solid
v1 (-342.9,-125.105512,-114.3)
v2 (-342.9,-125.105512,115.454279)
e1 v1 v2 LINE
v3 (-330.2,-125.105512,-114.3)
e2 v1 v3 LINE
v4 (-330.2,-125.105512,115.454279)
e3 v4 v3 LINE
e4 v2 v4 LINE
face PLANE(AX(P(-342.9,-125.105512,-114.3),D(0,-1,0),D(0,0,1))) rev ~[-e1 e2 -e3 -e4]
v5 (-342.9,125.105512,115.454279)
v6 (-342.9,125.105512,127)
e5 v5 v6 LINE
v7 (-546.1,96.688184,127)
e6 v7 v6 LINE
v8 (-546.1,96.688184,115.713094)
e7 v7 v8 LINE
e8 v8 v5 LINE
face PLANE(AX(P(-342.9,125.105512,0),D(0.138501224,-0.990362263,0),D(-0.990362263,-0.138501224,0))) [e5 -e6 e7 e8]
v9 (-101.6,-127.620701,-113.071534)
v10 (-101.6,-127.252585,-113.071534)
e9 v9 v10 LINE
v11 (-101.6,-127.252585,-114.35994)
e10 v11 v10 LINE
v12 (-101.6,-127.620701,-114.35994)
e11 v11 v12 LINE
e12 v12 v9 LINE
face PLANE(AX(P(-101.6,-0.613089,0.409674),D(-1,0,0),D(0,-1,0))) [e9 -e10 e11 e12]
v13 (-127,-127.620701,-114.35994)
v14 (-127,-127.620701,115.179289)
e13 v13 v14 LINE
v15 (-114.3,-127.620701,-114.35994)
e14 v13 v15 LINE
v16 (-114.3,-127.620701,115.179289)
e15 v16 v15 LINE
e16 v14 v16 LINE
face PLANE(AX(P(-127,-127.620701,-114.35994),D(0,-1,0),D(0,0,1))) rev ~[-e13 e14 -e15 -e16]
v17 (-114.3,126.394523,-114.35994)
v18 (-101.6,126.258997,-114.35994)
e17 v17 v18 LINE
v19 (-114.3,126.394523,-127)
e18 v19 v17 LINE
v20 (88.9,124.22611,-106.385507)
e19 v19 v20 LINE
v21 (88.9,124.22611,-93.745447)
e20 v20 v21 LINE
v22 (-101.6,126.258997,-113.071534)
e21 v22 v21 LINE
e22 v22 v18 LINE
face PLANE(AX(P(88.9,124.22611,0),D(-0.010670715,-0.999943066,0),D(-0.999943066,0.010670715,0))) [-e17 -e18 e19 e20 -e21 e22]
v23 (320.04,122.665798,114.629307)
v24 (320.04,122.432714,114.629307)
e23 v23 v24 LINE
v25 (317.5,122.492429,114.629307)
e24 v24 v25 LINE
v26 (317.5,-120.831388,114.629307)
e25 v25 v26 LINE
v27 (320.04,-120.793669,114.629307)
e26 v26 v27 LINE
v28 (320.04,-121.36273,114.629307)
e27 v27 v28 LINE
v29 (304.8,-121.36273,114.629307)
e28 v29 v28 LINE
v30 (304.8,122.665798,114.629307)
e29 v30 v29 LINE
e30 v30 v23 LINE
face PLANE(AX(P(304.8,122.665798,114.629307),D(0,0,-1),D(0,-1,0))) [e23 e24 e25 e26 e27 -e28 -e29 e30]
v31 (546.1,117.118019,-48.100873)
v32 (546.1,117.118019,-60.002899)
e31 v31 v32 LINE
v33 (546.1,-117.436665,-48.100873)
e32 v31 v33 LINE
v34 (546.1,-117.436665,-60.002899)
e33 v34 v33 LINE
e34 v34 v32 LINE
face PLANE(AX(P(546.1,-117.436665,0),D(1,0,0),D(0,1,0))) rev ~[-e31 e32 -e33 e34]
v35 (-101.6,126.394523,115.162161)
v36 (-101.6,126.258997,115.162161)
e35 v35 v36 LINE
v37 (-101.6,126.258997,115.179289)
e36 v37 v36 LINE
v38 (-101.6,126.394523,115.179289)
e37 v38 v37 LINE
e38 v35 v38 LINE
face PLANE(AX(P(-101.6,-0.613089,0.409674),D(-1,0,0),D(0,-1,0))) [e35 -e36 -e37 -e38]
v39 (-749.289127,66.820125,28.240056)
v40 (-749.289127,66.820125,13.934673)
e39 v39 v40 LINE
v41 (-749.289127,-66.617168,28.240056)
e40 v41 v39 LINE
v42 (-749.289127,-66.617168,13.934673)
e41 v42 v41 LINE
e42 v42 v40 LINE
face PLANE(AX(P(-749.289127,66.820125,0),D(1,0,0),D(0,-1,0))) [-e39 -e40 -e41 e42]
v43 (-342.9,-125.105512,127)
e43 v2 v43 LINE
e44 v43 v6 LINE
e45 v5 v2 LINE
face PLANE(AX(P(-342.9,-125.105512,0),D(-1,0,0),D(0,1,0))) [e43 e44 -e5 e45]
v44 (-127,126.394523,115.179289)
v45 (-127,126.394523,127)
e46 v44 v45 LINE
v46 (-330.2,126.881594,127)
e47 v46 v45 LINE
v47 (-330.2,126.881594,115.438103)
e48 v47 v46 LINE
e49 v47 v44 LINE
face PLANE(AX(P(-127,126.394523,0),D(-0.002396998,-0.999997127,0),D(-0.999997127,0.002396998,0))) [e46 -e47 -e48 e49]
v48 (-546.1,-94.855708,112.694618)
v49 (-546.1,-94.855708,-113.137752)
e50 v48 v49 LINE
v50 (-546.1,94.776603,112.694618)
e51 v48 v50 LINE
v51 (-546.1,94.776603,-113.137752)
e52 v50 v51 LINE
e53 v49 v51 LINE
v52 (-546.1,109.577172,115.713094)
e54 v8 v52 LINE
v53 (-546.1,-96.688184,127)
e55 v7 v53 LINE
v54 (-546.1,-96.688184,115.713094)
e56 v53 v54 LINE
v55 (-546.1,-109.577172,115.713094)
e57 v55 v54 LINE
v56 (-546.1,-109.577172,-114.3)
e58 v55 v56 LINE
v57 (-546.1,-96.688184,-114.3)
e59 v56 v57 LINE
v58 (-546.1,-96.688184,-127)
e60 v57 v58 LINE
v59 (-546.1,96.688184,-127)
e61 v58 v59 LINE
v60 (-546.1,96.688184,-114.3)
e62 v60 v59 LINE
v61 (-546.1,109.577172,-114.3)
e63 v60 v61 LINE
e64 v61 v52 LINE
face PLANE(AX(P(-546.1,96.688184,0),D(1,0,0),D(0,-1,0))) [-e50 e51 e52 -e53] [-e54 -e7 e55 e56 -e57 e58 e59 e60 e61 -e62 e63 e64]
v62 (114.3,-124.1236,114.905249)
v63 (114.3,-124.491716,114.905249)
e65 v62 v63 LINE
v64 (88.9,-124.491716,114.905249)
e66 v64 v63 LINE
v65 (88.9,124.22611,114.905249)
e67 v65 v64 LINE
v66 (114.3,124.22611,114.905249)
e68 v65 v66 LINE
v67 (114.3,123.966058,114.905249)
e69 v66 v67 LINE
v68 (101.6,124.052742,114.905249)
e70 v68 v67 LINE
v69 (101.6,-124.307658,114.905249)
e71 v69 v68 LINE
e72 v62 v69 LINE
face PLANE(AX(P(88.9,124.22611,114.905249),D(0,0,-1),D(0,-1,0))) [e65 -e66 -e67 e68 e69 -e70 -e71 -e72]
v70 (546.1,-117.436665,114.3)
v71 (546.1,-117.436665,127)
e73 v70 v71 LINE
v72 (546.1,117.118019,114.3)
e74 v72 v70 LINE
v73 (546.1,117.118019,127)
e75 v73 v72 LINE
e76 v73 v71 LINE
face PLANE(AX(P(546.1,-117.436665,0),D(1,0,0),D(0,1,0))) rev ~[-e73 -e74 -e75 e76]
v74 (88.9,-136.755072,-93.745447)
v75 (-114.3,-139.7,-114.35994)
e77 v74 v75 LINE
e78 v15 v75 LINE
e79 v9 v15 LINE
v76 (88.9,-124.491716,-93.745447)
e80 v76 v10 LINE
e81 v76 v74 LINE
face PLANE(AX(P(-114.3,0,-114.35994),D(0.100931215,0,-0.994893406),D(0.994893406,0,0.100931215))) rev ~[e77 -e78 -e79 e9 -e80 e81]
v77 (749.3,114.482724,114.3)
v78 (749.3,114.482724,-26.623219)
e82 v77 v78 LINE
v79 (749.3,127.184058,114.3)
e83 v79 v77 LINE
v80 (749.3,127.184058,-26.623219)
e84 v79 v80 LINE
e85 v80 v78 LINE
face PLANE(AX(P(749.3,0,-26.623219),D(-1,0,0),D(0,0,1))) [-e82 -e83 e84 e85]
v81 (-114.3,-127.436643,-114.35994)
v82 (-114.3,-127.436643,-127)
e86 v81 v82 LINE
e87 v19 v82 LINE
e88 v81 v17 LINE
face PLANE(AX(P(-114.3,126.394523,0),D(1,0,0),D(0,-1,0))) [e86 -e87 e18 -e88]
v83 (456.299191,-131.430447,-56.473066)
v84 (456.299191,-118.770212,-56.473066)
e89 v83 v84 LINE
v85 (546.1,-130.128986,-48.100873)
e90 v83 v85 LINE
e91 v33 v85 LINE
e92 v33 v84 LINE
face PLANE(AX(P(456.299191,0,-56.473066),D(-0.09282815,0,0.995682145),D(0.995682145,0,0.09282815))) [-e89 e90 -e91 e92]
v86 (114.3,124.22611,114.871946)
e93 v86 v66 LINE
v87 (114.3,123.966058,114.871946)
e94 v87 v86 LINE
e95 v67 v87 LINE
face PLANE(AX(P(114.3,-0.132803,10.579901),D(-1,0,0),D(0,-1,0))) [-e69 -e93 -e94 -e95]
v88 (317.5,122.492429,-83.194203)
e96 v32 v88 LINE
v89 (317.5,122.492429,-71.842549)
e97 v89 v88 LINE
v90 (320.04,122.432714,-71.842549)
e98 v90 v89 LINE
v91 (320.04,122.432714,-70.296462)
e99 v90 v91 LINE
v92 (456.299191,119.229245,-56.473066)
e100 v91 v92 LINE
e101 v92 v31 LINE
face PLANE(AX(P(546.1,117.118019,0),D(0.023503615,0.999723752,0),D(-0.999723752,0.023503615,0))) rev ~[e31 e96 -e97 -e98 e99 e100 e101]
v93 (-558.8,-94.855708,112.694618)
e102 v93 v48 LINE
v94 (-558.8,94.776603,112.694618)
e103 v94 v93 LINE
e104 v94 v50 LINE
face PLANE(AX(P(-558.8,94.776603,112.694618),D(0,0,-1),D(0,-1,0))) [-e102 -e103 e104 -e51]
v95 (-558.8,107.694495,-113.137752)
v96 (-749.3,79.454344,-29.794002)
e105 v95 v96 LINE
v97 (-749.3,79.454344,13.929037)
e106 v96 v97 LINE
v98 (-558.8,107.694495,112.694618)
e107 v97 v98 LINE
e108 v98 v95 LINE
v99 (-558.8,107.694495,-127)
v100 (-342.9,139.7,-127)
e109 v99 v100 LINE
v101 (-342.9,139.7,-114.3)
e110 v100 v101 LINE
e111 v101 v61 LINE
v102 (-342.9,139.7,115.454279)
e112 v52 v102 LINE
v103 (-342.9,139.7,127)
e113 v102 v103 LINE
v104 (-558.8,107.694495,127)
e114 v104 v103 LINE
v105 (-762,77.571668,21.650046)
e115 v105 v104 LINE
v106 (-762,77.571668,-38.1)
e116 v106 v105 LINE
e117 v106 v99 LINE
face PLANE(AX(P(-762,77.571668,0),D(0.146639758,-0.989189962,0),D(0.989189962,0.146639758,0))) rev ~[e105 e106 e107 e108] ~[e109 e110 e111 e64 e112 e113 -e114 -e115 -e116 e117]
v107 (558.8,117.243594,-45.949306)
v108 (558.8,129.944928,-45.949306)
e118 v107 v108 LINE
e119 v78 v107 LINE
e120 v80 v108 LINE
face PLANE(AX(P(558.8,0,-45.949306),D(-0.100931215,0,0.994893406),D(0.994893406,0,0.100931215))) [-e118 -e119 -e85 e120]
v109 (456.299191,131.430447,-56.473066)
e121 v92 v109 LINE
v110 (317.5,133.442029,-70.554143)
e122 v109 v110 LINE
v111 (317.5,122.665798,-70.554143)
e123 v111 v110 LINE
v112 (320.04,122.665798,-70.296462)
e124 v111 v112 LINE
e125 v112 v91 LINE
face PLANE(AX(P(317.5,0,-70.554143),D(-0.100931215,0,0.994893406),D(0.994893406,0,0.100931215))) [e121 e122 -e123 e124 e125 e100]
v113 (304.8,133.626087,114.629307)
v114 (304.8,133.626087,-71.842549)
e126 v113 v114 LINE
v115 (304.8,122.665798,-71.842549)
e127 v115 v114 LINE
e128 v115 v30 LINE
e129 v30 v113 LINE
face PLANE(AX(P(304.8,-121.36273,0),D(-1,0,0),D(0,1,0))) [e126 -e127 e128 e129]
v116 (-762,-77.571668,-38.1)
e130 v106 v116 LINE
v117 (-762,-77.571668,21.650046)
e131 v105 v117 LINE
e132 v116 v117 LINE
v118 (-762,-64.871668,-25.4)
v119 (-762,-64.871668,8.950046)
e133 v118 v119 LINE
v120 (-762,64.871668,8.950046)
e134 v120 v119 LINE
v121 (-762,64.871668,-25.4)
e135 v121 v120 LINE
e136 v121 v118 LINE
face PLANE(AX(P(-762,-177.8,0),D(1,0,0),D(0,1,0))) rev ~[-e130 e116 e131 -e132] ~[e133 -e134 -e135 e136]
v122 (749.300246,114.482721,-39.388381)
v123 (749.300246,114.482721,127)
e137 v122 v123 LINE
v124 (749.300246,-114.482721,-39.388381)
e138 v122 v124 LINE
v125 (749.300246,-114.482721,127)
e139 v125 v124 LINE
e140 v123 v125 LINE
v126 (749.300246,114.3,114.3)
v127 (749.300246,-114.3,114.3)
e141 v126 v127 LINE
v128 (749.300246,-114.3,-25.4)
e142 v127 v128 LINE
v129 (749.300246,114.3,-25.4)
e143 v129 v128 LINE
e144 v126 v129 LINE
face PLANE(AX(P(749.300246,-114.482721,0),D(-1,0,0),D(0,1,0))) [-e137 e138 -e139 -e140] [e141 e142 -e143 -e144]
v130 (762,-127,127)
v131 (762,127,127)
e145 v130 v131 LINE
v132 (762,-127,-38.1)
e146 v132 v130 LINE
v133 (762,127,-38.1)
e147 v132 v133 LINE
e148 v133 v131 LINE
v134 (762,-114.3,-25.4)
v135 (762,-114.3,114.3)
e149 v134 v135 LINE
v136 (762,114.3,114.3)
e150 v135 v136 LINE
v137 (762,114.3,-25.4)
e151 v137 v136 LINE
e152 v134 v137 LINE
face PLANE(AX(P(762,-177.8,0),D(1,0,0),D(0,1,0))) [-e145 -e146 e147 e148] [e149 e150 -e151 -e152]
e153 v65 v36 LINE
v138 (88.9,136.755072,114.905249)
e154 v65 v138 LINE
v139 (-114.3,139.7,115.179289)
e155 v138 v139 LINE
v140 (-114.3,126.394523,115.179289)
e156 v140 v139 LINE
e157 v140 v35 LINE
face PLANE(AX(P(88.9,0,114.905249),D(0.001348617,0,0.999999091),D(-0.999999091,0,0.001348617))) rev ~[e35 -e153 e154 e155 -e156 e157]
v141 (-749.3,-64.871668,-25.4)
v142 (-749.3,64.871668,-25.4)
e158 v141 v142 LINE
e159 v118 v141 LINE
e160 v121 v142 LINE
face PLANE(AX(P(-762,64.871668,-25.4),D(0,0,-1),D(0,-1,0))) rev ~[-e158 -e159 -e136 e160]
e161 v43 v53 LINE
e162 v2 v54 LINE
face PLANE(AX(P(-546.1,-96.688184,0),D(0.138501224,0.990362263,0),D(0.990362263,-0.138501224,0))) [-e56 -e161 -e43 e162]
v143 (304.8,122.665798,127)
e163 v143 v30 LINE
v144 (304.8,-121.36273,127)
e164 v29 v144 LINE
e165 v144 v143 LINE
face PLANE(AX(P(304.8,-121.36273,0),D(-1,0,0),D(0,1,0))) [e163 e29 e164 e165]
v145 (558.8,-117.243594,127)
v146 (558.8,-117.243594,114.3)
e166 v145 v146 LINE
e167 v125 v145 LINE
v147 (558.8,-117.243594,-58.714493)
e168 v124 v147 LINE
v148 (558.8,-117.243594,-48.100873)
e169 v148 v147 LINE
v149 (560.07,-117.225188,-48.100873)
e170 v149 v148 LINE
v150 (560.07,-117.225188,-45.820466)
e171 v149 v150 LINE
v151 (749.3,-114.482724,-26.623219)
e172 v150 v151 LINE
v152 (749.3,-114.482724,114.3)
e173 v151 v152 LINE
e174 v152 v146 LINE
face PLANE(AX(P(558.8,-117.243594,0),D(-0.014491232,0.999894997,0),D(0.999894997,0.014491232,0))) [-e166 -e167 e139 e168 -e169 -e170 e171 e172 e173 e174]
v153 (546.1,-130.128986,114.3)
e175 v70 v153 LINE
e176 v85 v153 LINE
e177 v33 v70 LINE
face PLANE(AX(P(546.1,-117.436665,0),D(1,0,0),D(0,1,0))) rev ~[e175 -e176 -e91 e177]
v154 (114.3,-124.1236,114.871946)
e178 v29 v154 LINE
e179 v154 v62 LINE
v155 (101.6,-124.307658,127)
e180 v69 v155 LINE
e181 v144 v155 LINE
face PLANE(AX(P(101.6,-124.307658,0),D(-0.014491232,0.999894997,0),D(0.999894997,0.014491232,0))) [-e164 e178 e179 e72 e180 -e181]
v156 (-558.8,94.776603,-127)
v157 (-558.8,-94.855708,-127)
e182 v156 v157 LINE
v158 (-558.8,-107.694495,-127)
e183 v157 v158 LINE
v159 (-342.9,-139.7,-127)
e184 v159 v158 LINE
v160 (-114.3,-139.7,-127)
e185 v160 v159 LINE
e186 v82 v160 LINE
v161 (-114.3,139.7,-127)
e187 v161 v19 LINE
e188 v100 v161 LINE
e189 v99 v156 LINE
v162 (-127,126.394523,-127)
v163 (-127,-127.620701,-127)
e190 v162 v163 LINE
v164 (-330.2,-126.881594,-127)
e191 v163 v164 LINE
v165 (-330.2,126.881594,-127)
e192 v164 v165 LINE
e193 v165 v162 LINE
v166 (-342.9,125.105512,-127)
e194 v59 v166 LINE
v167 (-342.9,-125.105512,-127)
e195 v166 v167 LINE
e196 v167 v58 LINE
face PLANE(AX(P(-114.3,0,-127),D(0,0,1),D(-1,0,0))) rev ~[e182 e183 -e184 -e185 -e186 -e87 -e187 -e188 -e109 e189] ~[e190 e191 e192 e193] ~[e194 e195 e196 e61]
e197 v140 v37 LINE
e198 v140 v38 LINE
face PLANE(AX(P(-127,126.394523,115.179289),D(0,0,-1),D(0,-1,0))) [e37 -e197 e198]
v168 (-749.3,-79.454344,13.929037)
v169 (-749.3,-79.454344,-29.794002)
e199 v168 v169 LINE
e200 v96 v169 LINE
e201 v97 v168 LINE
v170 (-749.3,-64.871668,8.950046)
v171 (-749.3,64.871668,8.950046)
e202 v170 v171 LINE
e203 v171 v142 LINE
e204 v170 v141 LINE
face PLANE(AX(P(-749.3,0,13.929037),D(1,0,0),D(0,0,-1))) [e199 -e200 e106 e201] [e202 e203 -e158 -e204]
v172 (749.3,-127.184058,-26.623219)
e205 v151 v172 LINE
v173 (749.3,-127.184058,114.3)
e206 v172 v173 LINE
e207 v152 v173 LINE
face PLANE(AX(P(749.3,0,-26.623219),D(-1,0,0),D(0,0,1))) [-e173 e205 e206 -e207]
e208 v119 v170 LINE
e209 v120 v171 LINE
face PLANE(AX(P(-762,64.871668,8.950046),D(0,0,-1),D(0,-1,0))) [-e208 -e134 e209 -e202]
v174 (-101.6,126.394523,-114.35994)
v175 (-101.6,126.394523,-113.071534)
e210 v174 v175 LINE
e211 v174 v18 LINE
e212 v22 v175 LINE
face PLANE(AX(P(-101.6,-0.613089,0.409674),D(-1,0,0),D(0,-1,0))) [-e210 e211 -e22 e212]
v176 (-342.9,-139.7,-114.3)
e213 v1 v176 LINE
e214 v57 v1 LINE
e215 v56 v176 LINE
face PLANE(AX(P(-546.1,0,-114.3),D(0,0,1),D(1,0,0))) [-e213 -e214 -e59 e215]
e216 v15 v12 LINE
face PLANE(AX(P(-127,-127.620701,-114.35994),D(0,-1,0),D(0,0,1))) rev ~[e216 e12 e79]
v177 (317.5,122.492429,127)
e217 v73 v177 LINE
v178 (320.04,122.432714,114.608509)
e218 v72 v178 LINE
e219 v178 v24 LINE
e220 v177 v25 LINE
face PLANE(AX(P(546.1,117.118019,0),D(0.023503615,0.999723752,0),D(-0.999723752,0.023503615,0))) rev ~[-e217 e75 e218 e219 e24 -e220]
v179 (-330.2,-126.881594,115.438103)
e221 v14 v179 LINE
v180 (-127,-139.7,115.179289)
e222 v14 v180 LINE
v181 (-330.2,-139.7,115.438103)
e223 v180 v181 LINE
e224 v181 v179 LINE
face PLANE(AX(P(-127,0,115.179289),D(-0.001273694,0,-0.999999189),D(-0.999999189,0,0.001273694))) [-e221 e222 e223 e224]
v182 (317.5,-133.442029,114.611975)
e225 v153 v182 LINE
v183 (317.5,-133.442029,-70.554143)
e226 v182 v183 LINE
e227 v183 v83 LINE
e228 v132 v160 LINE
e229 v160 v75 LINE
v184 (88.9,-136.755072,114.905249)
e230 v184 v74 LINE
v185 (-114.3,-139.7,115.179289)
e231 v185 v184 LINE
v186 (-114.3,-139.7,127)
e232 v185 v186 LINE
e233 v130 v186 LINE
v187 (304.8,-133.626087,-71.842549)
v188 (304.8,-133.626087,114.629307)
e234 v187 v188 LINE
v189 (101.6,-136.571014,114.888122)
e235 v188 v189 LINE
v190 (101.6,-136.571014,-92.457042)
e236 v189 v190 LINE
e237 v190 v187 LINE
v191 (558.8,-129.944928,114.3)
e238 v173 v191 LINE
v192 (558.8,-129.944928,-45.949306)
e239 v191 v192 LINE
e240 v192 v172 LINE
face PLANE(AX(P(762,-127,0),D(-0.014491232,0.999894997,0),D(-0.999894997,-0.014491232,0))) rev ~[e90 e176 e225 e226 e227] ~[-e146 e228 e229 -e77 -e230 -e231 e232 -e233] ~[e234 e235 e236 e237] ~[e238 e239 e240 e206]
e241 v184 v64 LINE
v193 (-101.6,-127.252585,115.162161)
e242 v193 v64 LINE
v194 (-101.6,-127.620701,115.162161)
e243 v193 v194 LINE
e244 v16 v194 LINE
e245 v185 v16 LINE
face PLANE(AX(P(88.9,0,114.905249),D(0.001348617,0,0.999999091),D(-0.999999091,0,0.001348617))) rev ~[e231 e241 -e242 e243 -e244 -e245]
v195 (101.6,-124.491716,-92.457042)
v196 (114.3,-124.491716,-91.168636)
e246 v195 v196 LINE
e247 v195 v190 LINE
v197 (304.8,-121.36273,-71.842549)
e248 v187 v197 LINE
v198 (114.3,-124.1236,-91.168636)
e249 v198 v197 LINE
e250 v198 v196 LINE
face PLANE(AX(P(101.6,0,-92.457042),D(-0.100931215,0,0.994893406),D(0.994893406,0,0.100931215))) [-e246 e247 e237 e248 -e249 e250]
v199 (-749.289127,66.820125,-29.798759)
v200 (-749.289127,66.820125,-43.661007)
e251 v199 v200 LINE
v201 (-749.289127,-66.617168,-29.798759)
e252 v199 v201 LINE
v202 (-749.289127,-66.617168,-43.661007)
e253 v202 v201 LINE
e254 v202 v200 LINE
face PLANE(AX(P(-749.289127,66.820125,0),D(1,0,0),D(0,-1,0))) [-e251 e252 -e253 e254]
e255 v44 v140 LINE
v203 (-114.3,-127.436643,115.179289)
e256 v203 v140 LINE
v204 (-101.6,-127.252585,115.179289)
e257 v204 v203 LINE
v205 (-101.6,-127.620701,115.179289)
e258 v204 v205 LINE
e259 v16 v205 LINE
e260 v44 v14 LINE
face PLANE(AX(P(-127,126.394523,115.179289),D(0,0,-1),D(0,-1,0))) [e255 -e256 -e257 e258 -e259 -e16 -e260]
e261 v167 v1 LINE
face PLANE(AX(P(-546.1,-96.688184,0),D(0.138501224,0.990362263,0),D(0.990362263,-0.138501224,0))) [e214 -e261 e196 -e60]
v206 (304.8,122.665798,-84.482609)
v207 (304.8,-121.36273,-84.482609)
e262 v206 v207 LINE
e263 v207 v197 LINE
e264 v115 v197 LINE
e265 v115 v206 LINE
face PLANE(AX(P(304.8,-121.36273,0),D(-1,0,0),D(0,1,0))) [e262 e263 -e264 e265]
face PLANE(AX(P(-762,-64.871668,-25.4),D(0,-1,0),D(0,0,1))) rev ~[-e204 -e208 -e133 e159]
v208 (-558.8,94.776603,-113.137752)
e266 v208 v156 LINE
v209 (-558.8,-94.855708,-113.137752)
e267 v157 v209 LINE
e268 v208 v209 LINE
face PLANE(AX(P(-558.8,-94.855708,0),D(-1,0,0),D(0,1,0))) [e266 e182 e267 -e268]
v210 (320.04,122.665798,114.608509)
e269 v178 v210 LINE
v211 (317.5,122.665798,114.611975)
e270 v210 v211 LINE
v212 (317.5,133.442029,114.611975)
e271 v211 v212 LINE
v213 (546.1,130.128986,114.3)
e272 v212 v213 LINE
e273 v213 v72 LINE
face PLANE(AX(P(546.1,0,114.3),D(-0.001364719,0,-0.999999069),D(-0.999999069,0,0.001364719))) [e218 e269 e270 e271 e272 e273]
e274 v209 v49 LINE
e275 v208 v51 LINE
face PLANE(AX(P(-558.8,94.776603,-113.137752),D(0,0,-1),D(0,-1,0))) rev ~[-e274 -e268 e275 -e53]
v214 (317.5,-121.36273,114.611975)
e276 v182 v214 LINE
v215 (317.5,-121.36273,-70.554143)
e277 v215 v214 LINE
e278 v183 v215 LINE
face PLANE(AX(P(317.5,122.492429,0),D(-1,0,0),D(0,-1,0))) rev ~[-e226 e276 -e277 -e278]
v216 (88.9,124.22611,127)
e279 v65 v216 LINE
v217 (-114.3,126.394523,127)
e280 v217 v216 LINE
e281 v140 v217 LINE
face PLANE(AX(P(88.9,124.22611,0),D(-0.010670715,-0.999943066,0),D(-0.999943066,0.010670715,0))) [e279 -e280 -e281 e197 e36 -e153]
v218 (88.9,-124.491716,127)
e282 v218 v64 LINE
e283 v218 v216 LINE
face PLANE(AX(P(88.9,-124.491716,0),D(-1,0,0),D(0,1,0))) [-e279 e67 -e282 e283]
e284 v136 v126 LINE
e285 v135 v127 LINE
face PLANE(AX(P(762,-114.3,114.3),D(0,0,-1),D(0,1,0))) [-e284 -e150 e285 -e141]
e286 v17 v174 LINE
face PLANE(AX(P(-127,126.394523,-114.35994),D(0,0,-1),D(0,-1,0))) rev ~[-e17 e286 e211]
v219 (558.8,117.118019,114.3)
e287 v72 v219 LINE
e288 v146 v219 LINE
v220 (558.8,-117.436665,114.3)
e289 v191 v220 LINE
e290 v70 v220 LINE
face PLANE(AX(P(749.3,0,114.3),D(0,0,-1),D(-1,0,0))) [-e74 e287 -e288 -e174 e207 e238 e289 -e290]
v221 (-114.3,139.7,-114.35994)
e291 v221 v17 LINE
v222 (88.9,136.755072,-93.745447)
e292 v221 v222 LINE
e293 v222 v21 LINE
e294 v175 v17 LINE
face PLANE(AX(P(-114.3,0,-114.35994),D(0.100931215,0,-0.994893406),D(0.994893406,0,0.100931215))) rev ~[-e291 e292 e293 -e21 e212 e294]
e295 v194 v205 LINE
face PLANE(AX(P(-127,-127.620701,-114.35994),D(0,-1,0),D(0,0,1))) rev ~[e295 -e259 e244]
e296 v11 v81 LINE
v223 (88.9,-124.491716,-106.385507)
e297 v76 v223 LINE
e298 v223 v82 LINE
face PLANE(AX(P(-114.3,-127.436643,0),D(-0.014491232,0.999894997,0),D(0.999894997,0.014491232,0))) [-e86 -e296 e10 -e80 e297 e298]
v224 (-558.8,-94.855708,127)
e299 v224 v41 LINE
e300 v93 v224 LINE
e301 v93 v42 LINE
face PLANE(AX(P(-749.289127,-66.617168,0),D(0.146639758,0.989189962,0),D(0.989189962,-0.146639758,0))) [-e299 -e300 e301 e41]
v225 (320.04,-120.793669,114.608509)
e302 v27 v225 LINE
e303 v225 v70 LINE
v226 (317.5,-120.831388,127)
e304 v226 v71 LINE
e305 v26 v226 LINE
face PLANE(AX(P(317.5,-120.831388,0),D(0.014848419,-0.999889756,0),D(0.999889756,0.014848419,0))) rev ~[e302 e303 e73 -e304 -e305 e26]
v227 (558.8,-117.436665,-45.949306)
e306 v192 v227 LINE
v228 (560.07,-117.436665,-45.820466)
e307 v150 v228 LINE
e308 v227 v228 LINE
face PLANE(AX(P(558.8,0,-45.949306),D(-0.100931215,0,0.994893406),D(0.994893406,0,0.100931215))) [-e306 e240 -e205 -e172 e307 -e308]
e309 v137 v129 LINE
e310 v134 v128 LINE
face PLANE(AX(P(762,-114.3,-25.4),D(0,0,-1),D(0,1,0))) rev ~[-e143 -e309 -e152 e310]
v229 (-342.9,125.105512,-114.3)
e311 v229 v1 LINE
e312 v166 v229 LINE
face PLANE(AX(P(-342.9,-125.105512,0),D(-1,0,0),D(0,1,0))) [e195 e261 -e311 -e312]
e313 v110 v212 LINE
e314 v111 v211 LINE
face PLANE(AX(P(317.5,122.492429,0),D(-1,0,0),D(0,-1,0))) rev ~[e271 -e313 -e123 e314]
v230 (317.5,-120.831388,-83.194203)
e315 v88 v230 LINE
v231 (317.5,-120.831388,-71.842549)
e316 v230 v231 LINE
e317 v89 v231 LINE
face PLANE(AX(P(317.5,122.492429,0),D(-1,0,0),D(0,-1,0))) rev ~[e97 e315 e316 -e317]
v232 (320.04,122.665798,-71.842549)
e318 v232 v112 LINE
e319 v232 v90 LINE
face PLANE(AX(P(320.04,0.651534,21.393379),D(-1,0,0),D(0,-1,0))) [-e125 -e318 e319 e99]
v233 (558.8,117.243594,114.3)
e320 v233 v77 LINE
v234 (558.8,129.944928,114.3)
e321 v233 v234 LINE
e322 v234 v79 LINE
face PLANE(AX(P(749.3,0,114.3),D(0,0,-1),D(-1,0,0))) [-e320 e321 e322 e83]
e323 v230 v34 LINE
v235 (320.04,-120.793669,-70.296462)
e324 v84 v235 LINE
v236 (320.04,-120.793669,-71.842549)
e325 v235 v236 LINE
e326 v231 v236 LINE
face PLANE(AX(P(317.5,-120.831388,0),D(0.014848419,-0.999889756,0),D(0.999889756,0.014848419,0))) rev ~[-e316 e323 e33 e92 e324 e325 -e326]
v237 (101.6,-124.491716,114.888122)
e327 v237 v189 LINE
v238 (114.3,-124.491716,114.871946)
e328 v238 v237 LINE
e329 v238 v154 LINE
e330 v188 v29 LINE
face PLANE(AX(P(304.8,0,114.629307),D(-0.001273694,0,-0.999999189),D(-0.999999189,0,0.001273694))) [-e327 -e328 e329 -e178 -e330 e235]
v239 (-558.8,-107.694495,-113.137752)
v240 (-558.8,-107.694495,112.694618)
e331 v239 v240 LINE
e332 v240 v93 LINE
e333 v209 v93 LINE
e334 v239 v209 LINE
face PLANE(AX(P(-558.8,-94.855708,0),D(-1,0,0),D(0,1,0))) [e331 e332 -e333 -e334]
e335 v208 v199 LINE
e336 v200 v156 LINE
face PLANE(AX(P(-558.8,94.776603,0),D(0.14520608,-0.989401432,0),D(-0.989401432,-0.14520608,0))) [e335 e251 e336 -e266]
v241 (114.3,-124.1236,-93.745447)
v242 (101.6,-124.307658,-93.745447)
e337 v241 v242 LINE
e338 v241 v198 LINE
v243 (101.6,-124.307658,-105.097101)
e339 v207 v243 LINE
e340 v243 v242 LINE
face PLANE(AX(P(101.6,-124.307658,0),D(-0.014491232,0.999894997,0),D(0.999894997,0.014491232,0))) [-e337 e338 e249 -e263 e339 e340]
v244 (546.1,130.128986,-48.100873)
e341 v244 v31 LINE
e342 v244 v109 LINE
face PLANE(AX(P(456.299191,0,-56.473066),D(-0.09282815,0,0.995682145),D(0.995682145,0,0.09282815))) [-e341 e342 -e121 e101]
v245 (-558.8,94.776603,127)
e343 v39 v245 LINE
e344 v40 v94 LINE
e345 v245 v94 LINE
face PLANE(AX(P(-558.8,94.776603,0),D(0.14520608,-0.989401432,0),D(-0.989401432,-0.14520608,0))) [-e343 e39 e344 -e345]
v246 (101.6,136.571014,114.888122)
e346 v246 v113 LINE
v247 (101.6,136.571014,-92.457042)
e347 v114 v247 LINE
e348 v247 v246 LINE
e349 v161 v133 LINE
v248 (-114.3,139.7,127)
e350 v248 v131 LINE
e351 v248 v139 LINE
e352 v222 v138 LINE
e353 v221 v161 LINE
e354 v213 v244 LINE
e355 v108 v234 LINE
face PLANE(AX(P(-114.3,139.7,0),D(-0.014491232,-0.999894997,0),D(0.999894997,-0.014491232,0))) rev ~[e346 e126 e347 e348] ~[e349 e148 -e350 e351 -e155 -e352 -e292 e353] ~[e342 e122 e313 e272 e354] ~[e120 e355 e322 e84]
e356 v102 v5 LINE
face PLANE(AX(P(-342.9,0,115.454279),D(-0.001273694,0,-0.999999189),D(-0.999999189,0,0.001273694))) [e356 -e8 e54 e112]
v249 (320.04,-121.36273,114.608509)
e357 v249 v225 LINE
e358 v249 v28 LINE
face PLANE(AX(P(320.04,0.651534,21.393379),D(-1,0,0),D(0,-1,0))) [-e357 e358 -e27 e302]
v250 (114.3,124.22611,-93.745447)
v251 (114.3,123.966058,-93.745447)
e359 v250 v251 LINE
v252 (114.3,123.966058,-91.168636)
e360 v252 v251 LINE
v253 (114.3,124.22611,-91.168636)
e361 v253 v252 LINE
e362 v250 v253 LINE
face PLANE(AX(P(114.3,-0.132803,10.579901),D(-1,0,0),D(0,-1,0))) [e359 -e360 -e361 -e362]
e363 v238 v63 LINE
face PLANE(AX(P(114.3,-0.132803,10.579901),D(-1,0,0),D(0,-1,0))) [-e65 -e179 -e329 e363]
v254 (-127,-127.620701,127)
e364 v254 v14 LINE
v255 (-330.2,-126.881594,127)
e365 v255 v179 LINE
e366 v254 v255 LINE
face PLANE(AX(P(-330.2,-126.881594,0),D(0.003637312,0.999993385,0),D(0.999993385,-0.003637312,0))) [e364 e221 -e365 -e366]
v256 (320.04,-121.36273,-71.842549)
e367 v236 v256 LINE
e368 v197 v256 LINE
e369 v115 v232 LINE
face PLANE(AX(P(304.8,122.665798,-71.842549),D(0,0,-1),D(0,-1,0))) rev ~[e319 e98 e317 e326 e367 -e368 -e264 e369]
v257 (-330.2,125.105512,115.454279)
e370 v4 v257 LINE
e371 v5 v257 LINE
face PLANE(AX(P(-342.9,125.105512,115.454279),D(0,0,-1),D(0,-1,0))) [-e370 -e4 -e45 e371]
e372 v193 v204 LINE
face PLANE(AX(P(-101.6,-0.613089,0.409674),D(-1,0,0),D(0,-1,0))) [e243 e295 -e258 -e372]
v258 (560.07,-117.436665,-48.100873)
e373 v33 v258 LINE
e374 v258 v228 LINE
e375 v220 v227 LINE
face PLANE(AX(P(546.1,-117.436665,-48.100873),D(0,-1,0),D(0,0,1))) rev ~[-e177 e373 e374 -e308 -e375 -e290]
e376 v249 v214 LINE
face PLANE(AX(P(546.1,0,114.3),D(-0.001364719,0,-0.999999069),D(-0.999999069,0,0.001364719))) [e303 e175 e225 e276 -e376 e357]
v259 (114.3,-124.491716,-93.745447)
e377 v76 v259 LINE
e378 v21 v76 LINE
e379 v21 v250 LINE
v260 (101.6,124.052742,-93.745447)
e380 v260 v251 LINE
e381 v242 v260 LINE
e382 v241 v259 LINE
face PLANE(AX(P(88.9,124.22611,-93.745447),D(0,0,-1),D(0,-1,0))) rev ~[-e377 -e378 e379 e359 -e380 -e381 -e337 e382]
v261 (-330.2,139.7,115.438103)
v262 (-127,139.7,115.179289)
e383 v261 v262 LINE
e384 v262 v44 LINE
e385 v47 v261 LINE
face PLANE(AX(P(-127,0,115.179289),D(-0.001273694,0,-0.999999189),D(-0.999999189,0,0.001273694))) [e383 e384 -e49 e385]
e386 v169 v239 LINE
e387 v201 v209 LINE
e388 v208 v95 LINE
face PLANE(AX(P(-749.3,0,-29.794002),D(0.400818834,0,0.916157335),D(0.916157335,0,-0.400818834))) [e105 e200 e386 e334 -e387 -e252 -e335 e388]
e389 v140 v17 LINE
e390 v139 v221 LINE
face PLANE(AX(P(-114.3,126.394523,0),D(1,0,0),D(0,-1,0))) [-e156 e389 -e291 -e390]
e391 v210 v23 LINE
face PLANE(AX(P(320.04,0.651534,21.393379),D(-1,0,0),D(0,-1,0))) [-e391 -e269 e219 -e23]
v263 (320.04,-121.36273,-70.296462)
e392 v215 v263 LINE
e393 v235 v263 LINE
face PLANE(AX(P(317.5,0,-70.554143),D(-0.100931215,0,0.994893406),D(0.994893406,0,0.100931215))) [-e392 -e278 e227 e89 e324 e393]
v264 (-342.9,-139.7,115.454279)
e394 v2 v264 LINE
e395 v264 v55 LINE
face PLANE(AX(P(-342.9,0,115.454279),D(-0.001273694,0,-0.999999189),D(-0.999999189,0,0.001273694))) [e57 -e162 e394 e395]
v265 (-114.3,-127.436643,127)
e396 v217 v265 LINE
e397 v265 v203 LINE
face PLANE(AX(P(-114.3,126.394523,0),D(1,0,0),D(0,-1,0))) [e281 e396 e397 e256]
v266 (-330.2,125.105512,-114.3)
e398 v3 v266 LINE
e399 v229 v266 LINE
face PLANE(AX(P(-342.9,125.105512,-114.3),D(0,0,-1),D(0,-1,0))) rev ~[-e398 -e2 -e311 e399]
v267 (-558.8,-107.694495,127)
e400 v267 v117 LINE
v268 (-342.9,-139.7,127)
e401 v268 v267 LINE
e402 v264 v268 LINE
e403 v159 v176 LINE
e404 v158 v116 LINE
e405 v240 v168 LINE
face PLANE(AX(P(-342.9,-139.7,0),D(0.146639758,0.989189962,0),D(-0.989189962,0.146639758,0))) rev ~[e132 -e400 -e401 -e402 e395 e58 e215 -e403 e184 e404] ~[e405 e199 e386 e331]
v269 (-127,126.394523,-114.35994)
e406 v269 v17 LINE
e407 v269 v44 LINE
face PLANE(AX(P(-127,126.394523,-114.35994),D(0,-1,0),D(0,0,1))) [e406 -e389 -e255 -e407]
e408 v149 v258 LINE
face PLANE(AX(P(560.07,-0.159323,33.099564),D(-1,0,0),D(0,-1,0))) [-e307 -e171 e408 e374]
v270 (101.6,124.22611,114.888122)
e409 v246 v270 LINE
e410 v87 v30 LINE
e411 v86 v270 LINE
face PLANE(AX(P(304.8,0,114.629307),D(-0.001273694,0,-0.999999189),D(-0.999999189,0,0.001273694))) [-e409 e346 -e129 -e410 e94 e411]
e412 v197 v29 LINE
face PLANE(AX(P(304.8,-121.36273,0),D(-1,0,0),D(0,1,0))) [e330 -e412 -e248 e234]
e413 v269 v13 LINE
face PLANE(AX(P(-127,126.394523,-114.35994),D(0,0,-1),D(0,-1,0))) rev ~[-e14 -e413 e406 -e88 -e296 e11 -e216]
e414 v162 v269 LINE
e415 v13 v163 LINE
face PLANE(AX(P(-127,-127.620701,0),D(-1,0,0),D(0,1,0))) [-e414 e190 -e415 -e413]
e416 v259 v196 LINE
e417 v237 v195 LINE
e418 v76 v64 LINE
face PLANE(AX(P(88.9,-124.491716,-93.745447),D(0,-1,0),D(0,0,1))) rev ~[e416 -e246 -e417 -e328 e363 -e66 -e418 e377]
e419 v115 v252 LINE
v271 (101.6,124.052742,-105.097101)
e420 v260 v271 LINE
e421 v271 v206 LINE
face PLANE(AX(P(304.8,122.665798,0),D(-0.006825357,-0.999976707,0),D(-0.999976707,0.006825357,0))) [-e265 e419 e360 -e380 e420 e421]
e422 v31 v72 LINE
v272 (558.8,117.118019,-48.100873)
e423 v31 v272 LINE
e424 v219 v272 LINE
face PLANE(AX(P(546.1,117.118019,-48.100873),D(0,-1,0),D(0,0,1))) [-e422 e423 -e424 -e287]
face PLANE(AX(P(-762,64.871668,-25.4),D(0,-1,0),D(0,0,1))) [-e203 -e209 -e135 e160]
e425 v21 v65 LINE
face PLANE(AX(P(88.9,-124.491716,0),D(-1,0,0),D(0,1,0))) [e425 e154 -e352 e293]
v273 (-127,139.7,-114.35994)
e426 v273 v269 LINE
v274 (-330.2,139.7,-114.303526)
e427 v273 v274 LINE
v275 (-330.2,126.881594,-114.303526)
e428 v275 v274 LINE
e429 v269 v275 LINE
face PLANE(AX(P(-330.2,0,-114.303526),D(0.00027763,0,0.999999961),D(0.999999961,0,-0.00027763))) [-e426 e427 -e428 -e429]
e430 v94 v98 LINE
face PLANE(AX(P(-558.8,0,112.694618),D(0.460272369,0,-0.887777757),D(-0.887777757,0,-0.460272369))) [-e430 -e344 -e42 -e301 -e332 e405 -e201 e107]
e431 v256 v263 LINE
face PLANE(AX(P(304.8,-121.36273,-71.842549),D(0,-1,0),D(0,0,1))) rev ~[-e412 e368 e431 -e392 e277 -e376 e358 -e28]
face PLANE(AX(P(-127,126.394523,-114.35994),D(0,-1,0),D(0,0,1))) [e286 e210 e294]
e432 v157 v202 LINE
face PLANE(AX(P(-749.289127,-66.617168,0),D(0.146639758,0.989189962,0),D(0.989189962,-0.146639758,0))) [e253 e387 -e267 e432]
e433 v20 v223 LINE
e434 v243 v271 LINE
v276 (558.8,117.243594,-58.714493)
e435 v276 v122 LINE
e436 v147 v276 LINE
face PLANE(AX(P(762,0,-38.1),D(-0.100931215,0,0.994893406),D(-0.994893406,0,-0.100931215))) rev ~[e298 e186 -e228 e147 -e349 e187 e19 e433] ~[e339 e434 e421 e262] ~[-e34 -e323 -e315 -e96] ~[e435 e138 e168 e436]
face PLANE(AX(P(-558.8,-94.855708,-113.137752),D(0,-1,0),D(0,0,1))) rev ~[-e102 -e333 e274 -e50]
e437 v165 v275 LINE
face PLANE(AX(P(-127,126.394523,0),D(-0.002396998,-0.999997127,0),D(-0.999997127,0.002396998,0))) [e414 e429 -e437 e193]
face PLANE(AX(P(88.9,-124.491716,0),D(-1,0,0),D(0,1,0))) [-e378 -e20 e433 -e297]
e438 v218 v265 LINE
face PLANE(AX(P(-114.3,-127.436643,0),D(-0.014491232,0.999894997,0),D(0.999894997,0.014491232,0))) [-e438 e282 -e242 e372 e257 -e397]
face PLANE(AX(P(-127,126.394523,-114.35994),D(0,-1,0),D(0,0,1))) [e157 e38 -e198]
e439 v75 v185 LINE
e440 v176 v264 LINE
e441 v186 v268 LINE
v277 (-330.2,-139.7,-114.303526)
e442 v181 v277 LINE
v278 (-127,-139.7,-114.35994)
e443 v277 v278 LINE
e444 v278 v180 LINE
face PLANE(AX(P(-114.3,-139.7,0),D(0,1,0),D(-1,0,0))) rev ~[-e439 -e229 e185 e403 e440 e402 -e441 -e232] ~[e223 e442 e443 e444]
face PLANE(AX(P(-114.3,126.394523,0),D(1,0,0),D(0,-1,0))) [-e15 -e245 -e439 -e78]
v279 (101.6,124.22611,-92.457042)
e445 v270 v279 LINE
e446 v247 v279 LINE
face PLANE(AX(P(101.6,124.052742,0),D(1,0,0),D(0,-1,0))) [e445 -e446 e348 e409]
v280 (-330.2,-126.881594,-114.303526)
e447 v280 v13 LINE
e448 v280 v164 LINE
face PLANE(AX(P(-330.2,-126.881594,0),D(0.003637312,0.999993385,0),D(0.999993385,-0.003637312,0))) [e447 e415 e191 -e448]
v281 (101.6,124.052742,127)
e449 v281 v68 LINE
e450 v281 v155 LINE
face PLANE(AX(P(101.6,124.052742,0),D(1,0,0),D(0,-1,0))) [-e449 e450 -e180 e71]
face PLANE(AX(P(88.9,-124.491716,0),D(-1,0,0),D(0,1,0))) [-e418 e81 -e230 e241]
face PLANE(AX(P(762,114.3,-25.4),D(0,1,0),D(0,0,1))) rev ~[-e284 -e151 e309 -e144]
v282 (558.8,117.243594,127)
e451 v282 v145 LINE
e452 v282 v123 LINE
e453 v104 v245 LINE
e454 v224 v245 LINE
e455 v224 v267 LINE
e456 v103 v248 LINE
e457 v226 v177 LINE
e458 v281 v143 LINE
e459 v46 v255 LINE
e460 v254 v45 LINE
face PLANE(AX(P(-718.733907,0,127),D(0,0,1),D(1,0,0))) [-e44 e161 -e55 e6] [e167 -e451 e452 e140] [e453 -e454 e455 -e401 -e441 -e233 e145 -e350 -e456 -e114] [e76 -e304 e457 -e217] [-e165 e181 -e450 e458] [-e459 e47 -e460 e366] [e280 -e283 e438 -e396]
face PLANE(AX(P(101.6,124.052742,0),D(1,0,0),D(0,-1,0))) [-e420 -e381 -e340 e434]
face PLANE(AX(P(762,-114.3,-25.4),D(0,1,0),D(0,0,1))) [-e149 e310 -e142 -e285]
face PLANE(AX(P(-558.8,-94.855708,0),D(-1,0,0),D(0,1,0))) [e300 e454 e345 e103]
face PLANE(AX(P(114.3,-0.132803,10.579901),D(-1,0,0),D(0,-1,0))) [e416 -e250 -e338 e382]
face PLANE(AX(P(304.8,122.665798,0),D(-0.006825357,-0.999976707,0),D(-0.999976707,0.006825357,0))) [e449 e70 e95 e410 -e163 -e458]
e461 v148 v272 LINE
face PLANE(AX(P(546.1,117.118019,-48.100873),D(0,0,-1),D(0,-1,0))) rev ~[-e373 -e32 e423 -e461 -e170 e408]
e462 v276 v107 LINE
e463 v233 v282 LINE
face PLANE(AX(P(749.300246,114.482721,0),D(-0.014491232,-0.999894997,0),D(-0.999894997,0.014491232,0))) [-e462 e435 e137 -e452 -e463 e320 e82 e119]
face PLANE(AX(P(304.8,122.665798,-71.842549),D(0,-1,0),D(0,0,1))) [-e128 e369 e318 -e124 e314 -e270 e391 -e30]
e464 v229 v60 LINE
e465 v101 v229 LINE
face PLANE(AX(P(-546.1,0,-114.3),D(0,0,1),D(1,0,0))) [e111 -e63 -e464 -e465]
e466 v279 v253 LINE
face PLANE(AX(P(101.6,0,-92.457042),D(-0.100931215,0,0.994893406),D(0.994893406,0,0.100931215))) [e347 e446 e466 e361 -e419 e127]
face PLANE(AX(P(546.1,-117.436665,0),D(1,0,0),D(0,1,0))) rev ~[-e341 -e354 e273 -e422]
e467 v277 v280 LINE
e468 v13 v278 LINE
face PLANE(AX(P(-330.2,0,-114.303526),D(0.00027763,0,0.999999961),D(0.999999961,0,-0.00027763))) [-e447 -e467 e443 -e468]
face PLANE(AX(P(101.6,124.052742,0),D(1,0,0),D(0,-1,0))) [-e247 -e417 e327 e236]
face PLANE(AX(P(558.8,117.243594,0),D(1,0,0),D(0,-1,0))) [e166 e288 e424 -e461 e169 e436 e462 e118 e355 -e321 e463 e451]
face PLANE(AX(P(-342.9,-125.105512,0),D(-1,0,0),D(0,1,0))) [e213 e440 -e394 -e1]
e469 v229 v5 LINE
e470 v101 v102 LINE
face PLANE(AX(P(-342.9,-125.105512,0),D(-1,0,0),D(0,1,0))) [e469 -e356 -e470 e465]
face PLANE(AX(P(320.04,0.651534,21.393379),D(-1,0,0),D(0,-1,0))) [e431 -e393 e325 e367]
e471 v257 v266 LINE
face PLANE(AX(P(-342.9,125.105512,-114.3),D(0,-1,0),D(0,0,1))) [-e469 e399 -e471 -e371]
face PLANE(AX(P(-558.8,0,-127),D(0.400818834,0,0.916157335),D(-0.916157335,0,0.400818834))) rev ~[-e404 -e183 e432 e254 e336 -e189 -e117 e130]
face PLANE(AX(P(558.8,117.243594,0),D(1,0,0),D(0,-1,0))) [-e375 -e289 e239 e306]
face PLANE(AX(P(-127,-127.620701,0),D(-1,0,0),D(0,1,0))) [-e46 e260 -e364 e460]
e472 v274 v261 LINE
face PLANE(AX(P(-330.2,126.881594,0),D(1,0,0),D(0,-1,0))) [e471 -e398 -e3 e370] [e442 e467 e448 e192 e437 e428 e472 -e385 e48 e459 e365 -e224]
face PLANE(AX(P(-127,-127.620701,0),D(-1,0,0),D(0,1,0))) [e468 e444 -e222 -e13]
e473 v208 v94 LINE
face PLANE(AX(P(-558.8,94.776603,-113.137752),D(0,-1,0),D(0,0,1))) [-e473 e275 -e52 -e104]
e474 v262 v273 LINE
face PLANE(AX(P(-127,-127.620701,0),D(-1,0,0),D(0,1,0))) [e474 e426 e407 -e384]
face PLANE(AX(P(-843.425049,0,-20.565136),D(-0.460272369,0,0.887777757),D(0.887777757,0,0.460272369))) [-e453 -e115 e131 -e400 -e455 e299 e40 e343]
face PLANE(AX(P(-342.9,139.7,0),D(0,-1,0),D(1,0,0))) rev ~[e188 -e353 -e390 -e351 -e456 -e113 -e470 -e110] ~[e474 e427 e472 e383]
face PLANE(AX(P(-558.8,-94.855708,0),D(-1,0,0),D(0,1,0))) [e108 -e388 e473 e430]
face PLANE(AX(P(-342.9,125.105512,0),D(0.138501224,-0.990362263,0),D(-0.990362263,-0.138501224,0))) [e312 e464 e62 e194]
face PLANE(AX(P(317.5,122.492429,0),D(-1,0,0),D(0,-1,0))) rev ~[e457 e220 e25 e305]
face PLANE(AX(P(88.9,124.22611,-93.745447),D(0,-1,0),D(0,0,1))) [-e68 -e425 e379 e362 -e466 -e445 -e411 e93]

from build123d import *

# Parameters (mm, degrees)
F0_W      = 1524
F0_H      = 355.6
F2_DEPTH  = 127
F5_W      = 12.7
F5_H      = 295.684620738
F6_DEPTH  = 177.8
F8_DEPTH  = 190.5
F9_W      = 1716.6963219643
F9_H      = 471.6365635395
F10_DEPTH = 190.5
F12_DEPTH = 190.5
F13_W     = 1570.3657865524
F13_H     = 143.7467932701
F14_DEPTH = 190.5
F15_W     = 189.6323112059
F15_H     = 225.8323701404
F16_DEPTH = 25.4
F17_W     = 250.2110230158
F17_H     = 229.754279344
F18_DEPTH = 25.4
F19_W     = 254.0152243916
F19_H     = 229.5392287665
F20_DEPTH = 25.4
F21_W     = 248.717826187
F21_H     = 208.6506967284
F22_DEPTH = 25.4
F23_W     = 244.0285278141
F23_H     = 186.4718558426
F24_DEPTH = 15.24
F25_W     = 234.5546834328
F25_H     = 162.4008728846
F26_DEPTH = 13.97
F28_W     = 129.7433354616
F28_H     = 34.350046491
F29_DEPTH = 25.4
F30_W     = 228.6
F30_H     = 139.7
F31_DEPTH = 12.7


# Not quite as in the source:
# - a feature names something its author has since deleted; it is built from what else it names


with BuildPart() as f2:
    # F0 (on Top) → F2 (new body, symmetric)
    with BuildSketch(Plane.XY):
        Rectangle(F0_W, F0_H)
    extrude(amount=F2_DEPTH, both=True)

    # F5 (on Front) → F6 (join, symmetric)
    with BuildSketch(Plane.XZ):
        with Locations((-552.45, 4.7732368112)):
            Rectangle(F5_W, F5_H)
        with Locations((-336.55, 4.7732368112)):
            Rectangle(F5_W, F5_H)
        with Locations((-120.65, 4.7732368112)):
            Rectangle(F5_W, F5_H)
        with Locations((95.25, 4.7732368112)):
            Rectangle(F5_W, F5_H)
        with Locations((552.45, 4.7732368112)):
            Rectangle(F5_W, F5_H)
        with Locations((311.15, 4.7732368112)):
            Rectangle(F5_W, F5_H)
    extrude(amount=F6_DEPTH, both=True)

    # F7 (on Front) → F8 (cut, symmetric)
    with BuildSketch(Plane.XZ):
        Polygon((-1015.0121382617, 307.3465449898), (-843.425049348, -20.5651363992), (-558.8, 127), align=None)
        Polygon((-558.8, -127), (-762, -38.1), (-810.4430437088, -38.1), (-810.4430437088, -218.054279685), (819.7100162506, -218.054279685), (819.7100162506, -38.1), (762, -38.1), (-114.3, -127), align=None)
    extrude(amount=F8_DEPTH, both=True, mode=Mode.SUBTRACT)

    # F9 (on Top) → F10 (cut, symmetric)
    with BuildSketch(Plane.XY):
        with Locations((-0.0626146793, 9.3713402748)):
            Rectangle(F9_W, F9_H)
        Polygon((762, 127), (762, 0), (762, -127), (-114.3, -139.7), (-342.9, -139.7), (-762, -77.5716677308), (-762, 0), (-762, 77.5716677308), (-342.9, 139.7), (-114.3, 139.7), align=None, mode=Mode.SUBTRACT)
    extrude(amount=F10_DEPTH, both=True, mode=Mode.SUBTRACT)

    # F11 (on Top) → F12 (cut, symmetric)
    with BuildSketch(Plane.XY):
        Polygon((-749.2891273529, 66.8201254906), (-749.2891273529, -66.6171684709), (-558.8, -94.8557077165), (-558.8, 94.7766034894), align=None)
        Polygon((749.3002457909, -114.4827207254), (749.3002457909, 114.4827207254), (558.8, 117.2435938528), (558.8, -117.2435938528), align=None)
        Polygon((-127, -127.6207012333), (-127, 126.3945231583), (-330.2, 126.8815944692), (-330.2, -126.8815944692), align=None)
        Polygon((-546.1, -96.6881841261), (-342.9, -125.1055115079), (-342.9, 125.1055115079), (-546.1, 96.6881841261), align=None)
        Polygon((88.9, -124.4917157261), (88.9, 124.226110461), (-114.3, 126.3945231583), (-114.3, -127.4366432623), align=None)
        Polygon((101.6, 124.0527423648), (101.6, -124.3076577551), (304.8, -121.3627302188), (304.8, 122.6657975952), align=None)
        Polygon((317.5, 122.4924294991), (317.5, -120.8313876883), (546.1, -117.4366649156), (546.1, 117.1180185172), align=None)
    extrude(amount=F12_DEPTH, both=True, mode=Mode.SUBTRACT)

    # F13 (on Front) → F14 (cut, symmetric)
    with BuildSketch(Plane.XZ):
        Polygon((-558.8, 112.6946179402), (-749.3, 13.9290365255), (-749.3, -29.7940022002), (-558.8, -113.1377522002), align=None)
        Polygon((-546.1, -114.3), (-342.9, -114.3), (-342.9, 115.454279344), (-546.1, 115.7130942238), align=None)
        Polygon((558.8, -45.9493061315), (749.3, -26.623219175), (749.3, 114.3), (558.8, 114.3), align=None)
        Polygon((-330.2, -114.303525896), (-127, -114.3599402323), (-127, 115.1792885342), (-330.2, 115.438103414), align=None)
        Polygon((304.8, 114.6293069146), (101.6, 114.8881217944), (101.6, -92.4570416816), (304.8, -71.842548928), align=None)
        Polygon((456.2991908124, -56.4730658021), (546.1, -48.1008728846), (546.1, 114.3), (317.5, 114.6119749718), (317.5, -70.5541431309), align=None)
        with Locations((66.4489865303, 198.8733966351)):
            Rectangle(F13_W, F13_H)
        Polygon((-114.3, 115.1792885342), (-114.3, -114.3599402323), (88.9, -93.7454474787), (88.9, 114.9052492497), align=None)
    extrude(amount=F14_DEPTH, both=True, mode=Mode.SUBTRACT)

    # F15 (on face) → F16 (cut)
    with BuildSketch(Plane(origin=(-558.8, 0, 0), x_dir=(0, -1, 0), z_dir=(-1, 0, 0))):
        with Locations((0.0395521135, -0.22156713)):
            Rectangle(F15_W, F15_H)
    extrude(amount=-F16_DEPTH, mode=Mode.SUBTRACT)

    # F17 (on face) → F18 (cut)
    with BuildSketch(Plane(origin=(-342.9, 0, 0), x_dir=(0, -1, 0), z_dir=(-1, 0, 0))):
        with Locations((0, 0.577139672)):
            Rectangle(F17_W, F17_H)
    extrude(amount=-F18_DEPTH, mode=Mode.SUBTRACT)

    # F19 (on face) → F20 (cut)
    with BuildSketch(Plane(origin=(-127, 0, 0), x_dir=(0, -1, 0), z_dir=(-1, 0, 0))):
        with Locations((0.6130890375, 0.4096741509)):
            Rectangle(F19_W, F19_H)
    extrude(amount=-F20_DEPTH, mode=Mode.SUBTRACT)

    # F21 (on face) → F22 (cut)
    with BuildSketch(Plane(origin=(88.9, 0, 0), x_dir=(0, -1, 0), z_dir=(-1, 0, 0))):
        with Locations((0.1328026326, 10.5799008855)):
            Rectangle(F21_W, F21_H)
    extrude(amount=-F22_DEPTH, mode=Mode.SUBTRACT)

    # F23 (on face) → F24 (cut)
    with BuildSketch(Plane(origin=(304.8, 0, 0), x_dir=(0, -1, 0), z_dir=(-1, 0, 0))):
        with Locations((-0.6515336882, 21.3933789933)):
            Rectangle(F23_W, F23_H)
    extrude(amount=-F24_DEPTH, mode=Mode.SUBTRACT)

    # F25 (on face) → F26 (cut)
    with BuildSketch(Plane(origin=(546.1, 0, 0), x_dir=(0, -1, 0), z_dir=(-1, 0, 0))):
        with Locations((0.1593231992, 33.0995635577)):
            Rectangle(F25_W, F25_H)
    extrude(amount=-F26_DEPTH, mode=Mode.SUBTRACT)

    # F28 (on face) → F29 (cut)
    with BuildSketch(Plane(origin=(-762, 0, 0), x_dir=(0, -1, 0), z_dir=(-1, 0, 0))):
        with Locations((0, -8.2249767545)):
            Rectangle(F28_W, F28_H)
    extrude(amount=-F29_DEPTH, mode=Mode.SUBTRACT)

    # F30 (on face) → F31 (cut)
    with BuildSketch(Plane.YZ.offset(762)):
        with Locations((0, 44.45)):
            Rectangle(F30_W, F30_H)
    extrude(amount=-F31_DEPTH, mode=Mode.SUBTRACT)


solid = f2.part
